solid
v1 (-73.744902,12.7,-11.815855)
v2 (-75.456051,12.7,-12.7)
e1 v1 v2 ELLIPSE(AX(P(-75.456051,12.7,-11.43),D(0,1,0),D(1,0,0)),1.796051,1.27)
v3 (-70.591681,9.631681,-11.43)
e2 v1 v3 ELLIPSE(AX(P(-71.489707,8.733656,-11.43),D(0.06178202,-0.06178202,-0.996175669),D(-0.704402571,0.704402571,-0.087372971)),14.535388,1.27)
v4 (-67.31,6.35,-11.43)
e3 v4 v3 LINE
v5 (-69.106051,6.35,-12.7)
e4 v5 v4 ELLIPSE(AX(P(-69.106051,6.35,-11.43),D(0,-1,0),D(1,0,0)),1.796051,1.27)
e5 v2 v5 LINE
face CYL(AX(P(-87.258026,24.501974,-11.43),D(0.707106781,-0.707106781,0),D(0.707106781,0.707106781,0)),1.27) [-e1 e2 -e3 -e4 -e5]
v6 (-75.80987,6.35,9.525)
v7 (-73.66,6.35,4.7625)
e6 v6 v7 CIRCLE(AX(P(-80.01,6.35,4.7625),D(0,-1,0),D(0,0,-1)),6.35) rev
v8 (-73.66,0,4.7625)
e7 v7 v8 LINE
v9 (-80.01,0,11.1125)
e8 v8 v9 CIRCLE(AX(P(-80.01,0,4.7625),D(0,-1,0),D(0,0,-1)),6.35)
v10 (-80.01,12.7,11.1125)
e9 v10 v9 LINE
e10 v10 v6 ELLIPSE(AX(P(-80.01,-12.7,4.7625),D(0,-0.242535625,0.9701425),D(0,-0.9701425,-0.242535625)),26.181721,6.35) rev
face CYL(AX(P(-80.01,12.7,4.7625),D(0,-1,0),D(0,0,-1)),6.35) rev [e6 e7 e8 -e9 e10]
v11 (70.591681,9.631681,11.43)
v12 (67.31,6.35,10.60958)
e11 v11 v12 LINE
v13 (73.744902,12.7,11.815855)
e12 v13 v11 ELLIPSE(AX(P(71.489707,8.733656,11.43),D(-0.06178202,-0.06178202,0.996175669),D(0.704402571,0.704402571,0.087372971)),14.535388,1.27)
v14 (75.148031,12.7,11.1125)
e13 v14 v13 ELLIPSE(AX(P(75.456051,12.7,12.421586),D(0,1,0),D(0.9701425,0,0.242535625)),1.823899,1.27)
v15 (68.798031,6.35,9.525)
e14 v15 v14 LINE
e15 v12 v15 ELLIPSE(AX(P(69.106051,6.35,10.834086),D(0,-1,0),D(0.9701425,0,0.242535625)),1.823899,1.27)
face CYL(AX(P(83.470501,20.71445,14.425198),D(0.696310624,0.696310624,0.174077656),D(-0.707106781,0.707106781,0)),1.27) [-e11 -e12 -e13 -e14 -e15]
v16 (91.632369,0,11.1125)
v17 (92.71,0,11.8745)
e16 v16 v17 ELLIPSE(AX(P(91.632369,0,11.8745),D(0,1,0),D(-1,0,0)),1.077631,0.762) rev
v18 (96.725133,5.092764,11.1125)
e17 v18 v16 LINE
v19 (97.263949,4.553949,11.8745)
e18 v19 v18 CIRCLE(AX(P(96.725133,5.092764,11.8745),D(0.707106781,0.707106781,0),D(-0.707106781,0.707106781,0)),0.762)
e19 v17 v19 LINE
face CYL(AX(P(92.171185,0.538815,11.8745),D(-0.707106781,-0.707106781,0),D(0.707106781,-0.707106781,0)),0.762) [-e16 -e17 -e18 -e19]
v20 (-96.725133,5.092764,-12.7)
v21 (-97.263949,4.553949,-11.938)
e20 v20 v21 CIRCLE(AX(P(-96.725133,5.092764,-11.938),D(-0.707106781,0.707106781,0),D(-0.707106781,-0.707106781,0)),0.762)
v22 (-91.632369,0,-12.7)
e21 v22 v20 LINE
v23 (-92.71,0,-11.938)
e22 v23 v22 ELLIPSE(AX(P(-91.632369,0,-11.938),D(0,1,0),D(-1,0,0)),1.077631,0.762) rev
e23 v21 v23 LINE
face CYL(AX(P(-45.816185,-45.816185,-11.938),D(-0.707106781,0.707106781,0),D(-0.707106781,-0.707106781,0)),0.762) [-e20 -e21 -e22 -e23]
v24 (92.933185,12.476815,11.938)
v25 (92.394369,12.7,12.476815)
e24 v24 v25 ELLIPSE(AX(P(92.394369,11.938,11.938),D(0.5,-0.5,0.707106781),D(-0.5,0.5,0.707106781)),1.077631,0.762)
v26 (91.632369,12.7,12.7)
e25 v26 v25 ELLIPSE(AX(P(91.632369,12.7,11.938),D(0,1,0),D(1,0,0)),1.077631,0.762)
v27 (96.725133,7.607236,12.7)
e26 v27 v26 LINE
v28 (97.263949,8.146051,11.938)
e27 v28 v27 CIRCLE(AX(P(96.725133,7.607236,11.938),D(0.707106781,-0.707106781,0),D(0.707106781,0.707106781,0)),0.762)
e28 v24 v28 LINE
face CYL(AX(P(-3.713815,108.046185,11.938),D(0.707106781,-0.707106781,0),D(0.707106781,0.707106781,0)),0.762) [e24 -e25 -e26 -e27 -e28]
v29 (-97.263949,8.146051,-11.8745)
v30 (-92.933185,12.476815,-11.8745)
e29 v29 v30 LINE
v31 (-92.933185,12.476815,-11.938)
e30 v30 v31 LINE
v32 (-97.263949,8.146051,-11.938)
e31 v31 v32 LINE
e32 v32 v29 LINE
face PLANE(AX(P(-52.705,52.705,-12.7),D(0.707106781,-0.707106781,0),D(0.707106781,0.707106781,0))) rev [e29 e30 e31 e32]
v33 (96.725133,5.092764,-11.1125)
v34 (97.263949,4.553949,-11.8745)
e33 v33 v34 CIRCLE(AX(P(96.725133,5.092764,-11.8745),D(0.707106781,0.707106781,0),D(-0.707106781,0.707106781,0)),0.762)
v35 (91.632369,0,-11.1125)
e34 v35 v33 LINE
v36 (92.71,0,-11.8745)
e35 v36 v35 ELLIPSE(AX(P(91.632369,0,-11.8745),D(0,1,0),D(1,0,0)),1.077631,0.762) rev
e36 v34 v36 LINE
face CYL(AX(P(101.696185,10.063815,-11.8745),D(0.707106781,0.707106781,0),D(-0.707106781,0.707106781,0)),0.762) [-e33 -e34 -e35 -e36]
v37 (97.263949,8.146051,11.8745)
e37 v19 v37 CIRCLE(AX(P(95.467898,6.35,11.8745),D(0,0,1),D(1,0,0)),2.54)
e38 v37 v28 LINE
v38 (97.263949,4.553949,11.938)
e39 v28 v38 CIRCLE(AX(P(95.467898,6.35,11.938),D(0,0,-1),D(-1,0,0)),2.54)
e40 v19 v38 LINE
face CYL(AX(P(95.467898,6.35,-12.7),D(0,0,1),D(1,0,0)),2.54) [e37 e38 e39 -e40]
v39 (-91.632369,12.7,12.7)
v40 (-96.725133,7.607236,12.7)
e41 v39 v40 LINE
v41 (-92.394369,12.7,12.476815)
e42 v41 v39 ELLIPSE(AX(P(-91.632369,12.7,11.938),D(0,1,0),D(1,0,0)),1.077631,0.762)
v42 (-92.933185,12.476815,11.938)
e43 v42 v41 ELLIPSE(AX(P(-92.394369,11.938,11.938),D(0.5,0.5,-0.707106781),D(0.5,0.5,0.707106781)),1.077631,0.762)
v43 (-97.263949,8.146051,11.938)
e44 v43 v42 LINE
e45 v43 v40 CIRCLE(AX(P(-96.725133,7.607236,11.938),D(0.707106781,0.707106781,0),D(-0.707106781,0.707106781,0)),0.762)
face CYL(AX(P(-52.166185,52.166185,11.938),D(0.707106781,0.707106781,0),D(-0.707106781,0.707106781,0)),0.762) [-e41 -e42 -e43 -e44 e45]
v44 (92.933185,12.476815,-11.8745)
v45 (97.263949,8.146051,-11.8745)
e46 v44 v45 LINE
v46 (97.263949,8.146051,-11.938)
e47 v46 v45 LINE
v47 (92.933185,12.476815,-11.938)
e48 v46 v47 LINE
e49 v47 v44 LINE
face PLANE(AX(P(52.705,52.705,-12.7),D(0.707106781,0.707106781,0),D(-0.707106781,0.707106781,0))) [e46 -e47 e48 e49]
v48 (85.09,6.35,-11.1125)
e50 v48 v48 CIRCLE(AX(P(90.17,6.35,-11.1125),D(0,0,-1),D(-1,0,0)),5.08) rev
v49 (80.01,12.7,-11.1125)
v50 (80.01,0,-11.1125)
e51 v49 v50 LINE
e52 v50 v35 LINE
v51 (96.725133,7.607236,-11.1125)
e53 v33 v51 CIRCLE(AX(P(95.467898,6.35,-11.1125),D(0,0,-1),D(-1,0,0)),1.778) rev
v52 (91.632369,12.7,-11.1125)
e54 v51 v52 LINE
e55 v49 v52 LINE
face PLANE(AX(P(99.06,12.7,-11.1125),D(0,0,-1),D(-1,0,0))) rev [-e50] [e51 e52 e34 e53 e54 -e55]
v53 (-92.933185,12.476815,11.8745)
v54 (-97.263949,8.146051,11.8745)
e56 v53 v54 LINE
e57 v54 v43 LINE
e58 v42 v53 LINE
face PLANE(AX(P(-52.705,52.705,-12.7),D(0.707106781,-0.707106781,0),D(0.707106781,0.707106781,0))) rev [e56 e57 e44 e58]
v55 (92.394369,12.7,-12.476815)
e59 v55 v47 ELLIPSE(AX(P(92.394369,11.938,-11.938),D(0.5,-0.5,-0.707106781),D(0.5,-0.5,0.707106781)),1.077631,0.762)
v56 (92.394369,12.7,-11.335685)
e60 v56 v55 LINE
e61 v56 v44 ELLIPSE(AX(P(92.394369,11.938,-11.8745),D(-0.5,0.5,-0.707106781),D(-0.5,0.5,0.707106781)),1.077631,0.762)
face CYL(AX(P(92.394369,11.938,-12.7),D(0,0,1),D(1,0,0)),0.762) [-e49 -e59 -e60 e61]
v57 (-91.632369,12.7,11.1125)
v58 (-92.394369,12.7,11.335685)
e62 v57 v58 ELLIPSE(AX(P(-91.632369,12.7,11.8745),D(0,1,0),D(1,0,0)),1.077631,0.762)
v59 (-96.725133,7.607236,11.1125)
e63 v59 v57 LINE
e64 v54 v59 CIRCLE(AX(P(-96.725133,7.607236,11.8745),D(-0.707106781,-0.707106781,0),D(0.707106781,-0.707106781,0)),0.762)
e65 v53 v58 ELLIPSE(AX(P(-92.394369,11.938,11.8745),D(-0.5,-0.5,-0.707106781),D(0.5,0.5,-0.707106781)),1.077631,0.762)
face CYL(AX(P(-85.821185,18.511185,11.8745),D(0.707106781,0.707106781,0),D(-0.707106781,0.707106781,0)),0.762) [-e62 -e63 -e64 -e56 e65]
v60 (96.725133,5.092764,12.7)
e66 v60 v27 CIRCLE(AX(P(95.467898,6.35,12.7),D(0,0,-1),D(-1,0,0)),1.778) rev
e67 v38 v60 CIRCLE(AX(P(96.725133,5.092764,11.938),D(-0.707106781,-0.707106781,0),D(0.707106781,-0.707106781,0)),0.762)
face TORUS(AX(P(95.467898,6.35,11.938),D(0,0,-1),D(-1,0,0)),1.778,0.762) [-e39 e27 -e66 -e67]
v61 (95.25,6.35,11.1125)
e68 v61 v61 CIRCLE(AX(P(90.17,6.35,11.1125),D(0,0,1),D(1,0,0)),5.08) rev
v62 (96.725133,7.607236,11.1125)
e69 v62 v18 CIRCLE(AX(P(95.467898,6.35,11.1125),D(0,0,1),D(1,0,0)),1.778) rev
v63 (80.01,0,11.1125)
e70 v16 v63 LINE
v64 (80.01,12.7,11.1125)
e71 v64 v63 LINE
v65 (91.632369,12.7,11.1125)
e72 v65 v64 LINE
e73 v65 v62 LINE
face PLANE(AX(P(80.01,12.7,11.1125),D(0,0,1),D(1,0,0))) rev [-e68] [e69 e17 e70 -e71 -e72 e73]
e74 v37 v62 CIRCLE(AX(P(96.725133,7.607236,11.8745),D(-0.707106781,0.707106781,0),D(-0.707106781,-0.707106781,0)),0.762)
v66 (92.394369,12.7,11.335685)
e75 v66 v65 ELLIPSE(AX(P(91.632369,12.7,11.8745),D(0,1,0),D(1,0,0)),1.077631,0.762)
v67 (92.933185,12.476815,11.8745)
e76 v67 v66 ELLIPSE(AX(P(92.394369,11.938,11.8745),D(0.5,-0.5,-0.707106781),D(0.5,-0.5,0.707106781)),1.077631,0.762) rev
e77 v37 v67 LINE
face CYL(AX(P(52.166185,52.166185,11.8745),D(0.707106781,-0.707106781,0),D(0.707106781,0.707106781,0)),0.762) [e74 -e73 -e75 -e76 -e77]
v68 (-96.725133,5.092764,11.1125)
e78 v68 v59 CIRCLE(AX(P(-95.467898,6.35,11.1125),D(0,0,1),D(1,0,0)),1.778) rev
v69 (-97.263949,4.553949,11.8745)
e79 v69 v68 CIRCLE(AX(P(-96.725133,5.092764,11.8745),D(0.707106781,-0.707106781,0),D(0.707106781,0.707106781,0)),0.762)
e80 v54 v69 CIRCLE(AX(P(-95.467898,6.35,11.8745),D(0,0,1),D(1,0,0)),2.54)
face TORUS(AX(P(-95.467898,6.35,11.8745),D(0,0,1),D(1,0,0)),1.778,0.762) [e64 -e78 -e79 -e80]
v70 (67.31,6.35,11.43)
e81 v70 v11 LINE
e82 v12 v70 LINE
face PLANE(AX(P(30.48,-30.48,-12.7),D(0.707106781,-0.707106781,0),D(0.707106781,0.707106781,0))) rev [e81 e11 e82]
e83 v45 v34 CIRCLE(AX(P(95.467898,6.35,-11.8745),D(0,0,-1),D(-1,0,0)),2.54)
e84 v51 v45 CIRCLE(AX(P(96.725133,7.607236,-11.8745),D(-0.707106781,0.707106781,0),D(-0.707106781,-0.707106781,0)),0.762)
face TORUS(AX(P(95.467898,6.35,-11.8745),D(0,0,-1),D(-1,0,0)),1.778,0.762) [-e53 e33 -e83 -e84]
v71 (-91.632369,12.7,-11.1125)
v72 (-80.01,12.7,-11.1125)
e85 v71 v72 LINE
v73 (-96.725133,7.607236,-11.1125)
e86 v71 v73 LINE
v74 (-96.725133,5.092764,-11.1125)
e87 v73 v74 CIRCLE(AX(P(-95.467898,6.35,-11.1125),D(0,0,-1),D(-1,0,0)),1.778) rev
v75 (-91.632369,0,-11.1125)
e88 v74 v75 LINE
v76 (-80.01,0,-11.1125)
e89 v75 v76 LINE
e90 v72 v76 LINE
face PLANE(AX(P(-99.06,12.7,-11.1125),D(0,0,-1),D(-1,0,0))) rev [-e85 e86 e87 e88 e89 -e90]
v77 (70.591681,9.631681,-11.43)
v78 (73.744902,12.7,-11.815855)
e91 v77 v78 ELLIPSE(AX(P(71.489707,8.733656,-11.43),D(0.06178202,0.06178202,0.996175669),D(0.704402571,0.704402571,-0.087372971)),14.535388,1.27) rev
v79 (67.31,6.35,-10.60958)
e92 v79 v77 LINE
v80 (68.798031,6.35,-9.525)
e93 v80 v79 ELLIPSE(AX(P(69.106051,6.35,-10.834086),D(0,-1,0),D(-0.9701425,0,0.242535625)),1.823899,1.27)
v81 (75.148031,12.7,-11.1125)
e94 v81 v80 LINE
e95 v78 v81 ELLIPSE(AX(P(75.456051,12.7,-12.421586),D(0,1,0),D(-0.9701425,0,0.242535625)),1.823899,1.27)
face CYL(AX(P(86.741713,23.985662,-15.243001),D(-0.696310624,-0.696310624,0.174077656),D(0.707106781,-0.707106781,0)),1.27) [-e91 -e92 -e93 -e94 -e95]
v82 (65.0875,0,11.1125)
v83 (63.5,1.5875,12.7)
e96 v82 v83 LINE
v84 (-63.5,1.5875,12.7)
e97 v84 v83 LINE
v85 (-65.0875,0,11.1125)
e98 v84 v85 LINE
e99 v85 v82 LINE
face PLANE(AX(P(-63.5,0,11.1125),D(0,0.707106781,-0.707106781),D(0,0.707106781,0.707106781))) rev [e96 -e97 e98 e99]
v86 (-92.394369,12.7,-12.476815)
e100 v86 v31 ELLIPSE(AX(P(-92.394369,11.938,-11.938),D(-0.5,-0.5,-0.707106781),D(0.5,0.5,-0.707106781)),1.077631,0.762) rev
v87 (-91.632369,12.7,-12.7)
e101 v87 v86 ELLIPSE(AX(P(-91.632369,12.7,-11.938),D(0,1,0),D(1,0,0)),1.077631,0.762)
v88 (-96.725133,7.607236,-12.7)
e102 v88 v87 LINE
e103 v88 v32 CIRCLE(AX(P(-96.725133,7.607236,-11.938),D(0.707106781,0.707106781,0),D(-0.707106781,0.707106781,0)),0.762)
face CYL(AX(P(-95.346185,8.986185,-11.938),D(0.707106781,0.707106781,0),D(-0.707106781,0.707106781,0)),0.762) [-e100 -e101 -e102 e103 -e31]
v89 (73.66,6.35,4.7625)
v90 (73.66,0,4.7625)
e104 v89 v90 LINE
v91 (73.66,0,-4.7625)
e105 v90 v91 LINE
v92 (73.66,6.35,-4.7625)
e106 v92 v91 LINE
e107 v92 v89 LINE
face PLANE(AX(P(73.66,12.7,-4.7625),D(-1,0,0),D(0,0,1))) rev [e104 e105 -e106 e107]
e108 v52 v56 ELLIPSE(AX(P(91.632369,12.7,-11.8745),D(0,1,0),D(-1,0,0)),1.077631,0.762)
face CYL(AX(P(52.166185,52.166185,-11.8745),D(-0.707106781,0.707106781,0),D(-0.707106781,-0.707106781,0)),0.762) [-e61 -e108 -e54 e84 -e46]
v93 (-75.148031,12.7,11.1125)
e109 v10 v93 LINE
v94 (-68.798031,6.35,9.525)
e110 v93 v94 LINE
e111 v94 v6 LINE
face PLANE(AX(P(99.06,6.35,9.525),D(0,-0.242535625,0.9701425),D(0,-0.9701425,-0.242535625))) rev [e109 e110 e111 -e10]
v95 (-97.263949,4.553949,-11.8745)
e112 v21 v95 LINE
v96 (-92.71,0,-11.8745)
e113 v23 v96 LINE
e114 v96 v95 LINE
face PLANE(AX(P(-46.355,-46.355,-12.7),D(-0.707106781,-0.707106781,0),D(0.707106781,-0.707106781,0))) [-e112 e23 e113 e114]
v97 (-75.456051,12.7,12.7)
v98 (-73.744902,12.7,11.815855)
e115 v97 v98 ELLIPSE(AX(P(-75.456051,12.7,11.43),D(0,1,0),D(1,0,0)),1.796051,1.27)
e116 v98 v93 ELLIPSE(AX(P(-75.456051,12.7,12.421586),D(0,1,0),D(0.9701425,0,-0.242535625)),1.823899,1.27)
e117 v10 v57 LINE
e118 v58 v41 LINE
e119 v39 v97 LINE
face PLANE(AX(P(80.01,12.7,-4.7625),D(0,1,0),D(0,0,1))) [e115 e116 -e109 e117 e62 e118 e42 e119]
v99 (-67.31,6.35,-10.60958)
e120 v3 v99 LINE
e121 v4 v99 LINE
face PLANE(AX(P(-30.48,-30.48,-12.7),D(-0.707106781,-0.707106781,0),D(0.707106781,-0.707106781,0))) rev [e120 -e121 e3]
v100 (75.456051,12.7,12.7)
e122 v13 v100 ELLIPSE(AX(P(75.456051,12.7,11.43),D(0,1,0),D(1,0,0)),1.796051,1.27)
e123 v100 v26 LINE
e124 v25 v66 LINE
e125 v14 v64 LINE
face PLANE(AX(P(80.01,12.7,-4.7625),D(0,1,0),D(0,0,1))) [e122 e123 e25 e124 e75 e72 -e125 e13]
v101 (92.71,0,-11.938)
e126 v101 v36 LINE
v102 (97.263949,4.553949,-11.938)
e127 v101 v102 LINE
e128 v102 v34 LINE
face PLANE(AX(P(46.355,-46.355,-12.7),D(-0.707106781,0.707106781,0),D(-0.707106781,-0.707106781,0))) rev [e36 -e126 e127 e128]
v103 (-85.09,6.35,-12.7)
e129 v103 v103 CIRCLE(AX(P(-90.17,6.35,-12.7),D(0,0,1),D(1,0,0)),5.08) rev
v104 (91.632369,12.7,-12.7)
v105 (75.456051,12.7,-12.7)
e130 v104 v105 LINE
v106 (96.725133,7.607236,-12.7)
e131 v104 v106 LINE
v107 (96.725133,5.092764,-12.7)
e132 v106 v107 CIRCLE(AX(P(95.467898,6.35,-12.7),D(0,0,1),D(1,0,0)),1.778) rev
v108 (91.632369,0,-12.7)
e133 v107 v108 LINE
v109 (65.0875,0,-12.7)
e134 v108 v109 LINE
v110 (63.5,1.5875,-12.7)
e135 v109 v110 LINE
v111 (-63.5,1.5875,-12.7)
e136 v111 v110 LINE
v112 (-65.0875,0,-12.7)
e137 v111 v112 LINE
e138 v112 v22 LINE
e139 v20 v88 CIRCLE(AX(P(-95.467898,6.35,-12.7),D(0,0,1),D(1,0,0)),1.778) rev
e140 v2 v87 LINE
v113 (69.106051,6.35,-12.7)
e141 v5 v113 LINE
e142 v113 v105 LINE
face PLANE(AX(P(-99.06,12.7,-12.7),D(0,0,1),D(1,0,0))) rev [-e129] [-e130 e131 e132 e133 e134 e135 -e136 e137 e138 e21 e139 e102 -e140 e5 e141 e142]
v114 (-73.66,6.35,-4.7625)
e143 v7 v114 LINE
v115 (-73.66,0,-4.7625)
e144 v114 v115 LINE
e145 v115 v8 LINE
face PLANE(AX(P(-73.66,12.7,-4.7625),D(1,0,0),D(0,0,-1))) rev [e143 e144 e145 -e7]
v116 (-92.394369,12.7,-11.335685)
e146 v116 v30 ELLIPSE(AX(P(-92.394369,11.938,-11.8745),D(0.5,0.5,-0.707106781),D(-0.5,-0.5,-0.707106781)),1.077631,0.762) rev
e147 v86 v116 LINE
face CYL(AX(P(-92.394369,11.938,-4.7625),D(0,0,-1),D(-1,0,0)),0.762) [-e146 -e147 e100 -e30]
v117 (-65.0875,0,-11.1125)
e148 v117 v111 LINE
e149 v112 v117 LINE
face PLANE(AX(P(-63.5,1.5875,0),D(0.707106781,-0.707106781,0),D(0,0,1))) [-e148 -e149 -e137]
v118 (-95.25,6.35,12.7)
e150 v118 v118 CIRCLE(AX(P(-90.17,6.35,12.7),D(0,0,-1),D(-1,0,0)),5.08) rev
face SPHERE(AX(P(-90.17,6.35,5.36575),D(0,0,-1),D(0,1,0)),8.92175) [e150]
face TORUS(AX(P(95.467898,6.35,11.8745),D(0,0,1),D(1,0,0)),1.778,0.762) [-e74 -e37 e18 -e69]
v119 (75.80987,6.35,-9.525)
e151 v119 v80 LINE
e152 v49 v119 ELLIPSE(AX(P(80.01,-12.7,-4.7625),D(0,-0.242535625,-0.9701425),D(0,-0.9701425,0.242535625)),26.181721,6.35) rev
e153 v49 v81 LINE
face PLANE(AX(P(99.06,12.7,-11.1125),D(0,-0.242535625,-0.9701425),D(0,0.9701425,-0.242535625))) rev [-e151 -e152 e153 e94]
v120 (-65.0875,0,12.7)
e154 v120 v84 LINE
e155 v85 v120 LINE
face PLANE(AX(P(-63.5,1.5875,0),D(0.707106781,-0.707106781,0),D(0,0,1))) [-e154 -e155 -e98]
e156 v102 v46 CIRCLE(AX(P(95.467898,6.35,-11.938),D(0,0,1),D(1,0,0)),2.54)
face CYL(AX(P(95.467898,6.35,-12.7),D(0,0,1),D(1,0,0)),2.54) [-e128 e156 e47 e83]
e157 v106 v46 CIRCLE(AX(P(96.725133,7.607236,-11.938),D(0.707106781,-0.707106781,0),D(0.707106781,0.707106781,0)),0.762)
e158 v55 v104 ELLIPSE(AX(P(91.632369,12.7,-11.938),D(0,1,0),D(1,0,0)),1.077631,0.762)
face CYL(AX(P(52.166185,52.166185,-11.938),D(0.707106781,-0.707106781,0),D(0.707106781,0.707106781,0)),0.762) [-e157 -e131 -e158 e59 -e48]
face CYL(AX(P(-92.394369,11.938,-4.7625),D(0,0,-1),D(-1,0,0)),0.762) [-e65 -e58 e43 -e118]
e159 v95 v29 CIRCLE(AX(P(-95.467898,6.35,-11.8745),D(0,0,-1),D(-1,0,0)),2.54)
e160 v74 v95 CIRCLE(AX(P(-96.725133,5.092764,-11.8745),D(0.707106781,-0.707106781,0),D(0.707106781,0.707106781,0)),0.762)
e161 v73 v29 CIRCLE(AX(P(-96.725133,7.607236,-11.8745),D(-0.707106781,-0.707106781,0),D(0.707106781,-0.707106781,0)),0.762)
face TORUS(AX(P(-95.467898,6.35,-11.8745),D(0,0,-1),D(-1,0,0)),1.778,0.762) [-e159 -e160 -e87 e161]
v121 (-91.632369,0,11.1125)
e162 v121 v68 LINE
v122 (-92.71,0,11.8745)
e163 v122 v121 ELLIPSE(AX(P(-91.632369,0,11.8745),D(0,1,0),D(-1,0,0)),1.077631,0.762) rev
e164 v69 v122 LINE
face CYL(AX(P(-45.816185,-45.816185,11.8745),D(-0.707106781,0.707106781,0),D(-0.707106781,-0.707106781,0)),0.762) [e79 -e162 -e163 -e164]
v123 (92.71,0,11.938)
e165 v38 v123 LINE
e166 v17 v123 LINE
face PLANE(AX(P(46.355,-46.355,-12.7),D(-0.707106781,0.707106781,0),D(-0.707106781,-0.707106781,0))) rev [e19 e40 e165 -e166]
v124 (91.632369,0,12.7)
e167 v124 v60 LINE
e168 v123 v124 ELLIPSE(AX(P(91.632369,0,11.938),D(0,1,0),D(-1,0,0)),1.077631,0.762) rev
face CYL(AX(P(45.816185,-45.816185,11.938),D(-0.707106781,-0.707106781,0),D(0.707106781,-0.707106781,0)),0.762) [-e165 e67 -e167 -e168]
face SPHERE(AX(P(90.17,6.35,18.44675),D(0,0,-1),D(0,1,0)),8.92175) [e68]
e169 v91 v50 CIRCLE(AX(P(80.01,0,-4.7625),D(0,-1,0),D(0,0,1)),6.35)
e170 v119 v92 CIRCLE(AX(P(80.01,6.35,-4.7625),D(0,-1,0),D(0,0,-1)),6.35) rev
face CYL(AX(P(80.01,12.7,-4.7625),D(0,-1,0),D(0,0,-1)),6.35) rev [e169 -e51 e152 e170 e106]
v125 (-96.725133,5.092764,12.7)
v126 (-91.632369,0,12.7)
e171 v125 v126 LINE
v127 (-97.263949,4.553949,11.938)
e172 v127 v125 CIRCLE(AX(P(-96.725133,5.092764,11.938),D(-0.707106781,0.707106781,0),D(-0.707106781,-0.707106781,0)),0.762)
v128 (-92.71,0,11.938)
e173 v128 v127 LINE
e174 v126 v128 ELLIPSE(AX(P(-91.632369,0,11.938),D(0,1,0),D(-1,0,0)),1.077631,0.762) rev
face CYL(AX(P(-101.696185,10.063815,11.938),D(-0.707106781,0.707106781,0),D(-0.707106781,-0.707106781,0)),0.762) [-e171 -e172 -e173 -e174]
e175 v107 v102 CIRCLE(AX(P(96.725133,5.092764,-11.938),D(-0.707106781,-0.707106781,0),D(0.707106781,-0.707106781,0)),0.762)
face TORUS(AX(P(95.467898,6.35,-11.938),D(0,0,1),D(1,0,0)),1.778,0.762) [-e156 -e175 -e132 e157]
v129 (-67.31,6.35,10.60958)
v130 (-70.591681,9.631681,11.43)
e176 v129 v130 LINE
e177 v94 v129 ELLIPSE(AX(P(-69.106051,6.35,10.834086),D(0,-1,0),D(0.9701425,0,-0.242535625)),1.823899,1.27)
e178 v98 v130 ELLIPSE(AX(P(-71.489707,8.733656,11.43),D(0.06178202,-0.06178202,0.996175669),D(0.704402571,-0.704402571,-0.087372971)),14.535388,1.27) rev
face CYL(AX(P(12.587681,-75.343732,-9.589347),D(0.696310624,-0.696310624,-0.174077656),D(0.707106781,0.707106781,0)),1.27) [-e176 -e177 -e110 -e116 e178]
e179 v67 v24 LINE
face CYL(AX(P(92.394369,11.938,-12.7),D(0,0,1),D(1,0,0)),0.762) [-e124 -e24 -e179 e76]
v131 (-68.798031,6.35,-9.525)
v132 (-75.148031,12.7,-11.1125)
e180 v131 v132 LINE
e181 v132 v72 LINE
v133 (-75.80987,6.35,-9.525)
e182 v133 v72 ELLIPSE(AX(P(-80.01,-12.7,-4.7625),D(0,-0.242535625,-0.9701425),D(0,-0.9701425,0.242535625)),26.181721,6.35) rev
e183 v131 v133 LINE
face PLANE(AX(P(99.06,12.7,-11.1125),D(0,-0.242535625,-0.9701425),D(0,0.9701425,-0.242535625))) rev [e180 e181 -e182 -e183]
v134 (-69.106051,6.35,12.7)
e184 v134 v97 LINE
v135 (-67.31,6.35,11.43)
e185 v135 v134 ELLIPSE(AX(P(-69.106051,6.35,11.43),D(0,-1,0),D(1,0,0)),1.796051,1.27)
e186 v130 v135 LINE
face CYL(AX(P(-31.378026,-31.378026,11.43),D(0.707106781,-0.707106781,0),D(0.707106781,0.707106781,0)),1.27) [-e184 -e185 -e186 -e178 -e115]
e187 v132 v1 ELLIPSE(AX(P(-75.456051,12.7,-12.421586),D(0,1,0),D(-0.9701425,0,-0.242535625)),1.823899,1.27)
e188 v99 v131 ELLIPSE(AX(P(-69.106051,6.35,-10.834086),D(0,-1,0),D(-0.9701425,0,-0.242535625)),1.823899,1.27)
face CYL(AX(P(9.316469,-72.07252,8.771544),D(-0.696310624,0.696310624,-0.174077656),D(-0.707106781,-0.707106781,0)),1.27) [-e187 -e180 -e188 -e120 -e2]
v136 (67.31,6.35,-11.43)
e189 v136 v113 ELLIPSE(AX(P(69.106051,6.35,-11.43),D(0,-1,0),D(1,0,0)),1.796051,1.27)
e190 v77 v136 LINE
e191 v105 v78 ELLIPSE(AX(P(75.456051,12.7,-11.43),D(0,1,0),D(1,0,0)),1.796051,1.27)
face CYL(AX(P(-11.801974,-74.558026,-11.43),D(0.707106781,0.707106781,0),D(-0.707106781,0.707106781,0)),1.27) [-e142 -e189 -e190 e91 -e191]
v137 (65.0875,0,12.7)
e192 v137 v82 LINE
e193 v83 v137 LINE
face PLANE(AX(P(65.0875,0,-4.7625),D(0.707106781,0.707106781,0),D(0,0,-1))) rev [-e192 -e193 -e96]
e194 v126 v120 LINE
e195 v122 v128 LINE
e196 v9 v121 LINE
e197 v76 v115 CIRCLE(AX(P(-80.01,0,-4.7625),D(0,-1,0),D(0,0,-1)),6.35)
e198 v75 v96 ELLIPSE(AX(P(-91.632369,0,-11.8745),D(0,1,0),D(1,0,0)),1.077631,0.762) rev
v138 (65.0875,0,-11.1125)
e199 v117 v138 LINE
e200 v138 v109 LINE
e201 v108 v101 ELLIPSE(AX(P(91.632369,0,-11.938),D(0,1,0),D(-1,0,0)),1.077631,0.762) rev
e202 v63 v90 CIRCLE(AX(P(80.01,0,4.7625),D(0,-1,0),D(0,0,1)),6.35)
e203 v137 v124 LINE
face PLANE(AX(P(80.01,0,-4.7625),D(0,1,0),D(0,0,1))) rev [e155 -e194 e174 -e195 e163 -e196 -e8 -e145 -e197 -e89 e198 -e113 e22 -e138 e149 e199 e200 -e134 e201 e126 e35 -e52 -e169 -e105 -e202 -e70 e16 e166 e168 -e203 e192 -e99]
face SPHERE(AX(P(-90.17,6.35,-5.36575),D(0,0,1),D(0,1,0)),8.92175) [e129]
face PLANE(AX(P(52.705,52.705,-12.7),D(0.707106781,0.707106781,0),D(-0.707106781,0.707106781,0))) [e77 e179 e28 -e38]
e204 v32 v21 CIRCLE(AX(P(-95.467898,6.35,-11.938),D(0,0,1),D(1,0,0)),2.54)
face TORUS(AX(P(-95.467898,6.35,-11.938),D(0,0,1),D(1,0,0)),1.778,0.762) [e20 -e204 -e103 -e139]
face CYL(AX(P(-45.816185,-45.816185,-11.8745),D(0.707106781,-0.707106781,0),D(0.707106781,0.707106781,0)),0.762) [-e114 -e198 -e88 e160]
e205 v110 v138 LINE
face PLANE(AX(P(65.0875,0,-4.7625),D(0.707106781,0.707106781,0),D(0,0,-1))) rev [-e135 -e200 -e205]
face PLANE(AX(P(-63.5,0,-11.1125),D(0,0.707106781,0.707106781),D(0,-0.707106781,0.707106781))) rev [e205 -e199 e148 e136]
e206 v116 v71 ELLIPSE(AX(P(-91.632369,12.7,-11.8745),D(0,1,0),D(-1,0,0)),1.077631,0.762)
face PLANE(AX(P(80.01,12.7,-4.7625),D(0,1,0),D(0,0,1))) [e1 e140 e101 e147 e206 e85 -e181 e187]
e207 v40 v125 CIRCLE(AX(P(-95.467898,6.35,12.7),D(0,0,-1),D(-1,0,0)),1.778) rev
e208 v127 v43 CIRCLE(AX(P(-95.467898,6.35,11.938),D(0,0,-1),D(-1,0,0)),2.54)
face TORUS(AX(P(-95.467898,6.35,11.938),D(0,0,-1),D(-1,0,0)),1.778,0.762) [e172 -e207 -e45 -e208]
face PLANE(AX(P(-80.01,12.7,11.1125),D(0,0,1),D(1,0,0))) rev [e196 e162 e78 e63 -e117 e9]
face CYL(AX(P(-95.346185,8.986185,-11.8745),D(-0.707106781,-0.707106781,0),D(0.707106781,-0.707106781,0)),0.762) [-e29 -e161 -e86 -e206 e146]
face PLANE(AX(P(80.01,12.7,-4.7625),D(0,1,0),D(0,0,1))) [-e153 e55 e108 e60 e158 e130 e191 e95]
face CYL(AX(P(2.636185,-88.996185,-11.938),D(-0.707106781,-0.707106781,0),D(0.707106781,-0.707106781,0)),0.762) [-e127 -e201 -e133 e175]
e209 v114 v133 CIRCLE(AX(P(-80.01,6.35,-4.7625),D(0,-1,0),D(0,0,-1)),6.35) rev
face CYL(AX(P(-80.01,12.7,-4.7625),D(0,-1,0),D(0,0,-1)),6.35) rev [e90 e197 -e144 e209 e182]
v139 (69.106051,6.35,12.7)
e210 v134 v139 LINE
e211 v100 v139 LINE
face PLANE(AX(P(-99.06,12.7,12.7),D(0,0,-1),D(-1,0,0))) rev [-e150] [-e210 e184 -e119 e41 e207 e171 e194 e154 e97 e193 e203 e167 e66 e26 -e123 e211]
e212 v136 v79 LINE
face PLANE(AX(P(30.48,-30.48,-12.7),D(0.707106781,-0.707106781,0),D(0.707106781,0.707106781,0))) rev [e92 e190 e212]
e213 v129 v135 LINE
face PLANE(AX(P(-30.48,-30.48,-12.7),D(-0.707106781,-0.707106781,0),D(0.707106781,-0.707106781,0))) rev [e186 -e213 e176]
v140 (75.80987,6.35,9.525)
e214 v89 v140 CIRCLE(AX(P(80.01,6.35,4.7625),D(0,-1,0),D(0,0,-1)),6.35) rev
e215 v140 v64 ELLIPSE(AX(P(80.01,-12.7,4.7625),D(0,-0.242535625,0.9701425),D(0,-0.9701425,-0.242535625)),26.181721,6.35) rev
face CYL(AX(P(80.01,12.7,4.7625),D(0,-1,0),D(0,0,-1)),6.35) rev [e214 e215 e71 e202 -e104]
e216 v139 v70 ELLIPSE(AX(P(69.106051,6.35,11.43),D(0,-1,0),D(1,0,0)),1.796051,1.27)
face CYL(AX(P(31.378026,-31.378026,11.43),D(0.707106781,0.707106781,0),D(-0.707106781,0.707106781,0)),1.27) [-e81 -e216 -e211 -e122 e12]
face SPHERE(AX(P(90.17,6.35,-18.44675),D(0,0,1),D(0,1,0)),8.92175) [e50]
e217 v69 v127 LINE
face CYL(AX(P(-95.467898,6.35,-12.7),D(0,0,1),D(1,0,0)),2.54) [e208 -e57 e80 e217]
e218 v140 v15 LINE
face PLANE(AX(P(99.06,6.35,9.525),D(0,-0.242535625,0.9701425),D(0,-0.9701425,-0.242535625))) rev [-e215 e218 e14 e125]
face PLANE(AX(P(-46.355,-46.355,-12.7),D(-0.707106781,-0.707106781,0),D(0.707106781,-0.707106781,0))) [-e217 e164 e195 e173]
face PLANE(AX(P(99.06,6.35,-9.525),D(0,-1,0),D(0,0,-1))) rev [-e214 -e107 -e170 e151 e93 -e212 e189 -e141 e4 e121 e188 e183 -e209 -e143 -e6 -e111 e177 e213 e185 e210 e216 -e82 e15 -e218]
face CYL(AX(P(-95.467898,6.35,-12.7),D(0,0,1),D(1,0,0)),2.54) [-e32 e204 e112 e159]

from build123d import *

# Parameters (mm, degrees)
BOSS_EXTRUDE1_DEPTH = 12.7
CUT_EXTRUDE2_DEPTH  = 199.932436772
CUT_EXTRUDE1_DEPTH  = 104.050150898
CUT_EXTRUDE3_DEPTH  = 63.5
CHAMFER1_SIZE       = 1.5875
FILLET1_R           = 0.762
FILLET2_R           = 1.27


# Some blends are built 0.0001 mm under size
with BuildPart() as part:
    # Sketch1 → Boss-Extrude1 (new body)
    with BuildSketch(Plane(origin=(0, 0, 0), x_dir=(1, 0, 0), z_dir=(0, 1, 0))):
        with BuildLine():
            Line((-99.06, -12.7), (99.06, -12.7))
            Line((99.06, -12.7), (99.06, -11.1125))
            Line((99.06, -11.1125), (80.01, -11.1125))
            ThreePointArc((80.01, -11.1125), (75.519871939, -9.252628061), (73.66, -4.7625))
            Line((73.66, -4.7625), (73.66, 4.7625))
            ThreePointArc((73.66, 4.7625), (75.519871939, 9.252628061), (80.01, 11.1125))
            Line((80.01, 11.1125), (99.06, 11.1125))
            Line((99.06, 11.1125), (99.06, 12.7))
            Line((99.06, 12.7), (-99.06, 12.7))
            Line((-99.06, 12.7), (-99.06, 11.1125))
            Line((-99.06, 11.1125), (-80.01, 11.1125))
            ThreePointArc((-80.01, 11.1125), (-75.519871939, 9.252628061), (-73.66, 4.7625))
            Line((-73.66, 4.7625), (-73.66, -4.7625))
            ThreePointArc((-73.66, -4.7625), (-75.519871939, -9.252628061), (-80.01, -11.1125))
            Line((-80.01, -11.1125), (-99.06, -11.1125))
            Line((-99.06, -11.1125), (-99.06, -12.7))
        make_face()
    extrude(amount=BOSS_EXTRUDE1_DEPTH)

    # Sketch3 → Cut-Extrude2 (cut, through all)
    with BuildSketch(Plane.ZY.offset(99.06)):
        Polygon((11.1125, 12.7), (4.7625, 12.7), (-4.7625, 12.7), (-11.1125, 12.7), (-9.525, 6.35), (9.525, 6.35), align=None)
    extrude(amount=-CUT_EXTRUDE2_DEPTH, mode=Mode.SUBTRACT)

    # Sketch2 → Cut-Extrude1 (cut, through all)
    with BuildSketch(Plane.XY.offset(12.7)):
        Polygon((73.66, 12.7), (-73.66, 12.7), (-67.31, 6.35), (67.31, 6.35), align=None)
        with BuildLine():
            Line((97.263948776, 4.553948776), (92.71, 0))
            Line((92.71, 0), (99.06, 0))
            Line((99.06, 0), (99.06, 12.7))
            Line((99.06, 12.7), (92.71, 12.7))
            Line((92.71, 12.7), (97.263948776, 8.146051224))
            ThreePointArc((97.263948776, 8.146051224), (98.007897552, 6.35), (97.263948776, 4.553948776))
        make_face()
        with BuildLine():
            ThreePointArc((-97.263948776, 4.553948776), (-98.007897552, 6.35), (-97.263948776, 8.146051224))
            Line((-97.263948776, 8.146051224), (-92.71, 12.7))
            Line((-92.71, 12.7), (-99.06, 12.7))
            Line((-99.06, 12.7), (-99.06, 0))
            Line((-99.06, 0), (-92.71, 0))
            Line((-92.71, 0), (-97.263948776, 4.553948776))
        make_face()
    extrude(amount=-CUT_EXTRUDE1_DEPTH, mode=Mode.SUBTRACT)

    # Sketch4 → Revolve1 (revolve)
    with BuildSketch(Plane.ZY.offset(90.17)):
        with BuildLine():
            Line((12.7, 6.35), (12.7, 11.43))
            ThreePointArc((12.7, 11.43), (13.881381744, 9.01113492), (14.2875, 6.35))
            Line((14.2875, 6.35), (12.7, 6.35))
        make_face()
    revolve1 = revolve(axis=Axis((-90.17, 6.35, 0), (0, 0, 1)))

    # Mirror1: Revolve1 across plane
    add(revolve1.mirror(Plane.XY))

    # Sketch5 → Revolve2 (revolve)
    with BuildSketch(Plane(origin=(90.17, 0, 0), x_dir=(0, 0, -1), z_dir=(1, 0, 0))):
        with BuildLine():
            Line((11.1125, 6.35), (11.1125, 11.43))
            ThreePointArc((11.1125, 11.43), (9.931118256, 9.01113492), (9.525, 6.35))
            Line((9.525, 6.35), (11.1125, 6.35))
        make_face()
    revolve2 = revolve(axis=Axis((90.17, 6.35, 0), (0, 0, -1)))

    # Mirror2: Revolve2 across plane
    add(revolve2.mirror(Plane.XY))

    # Sketch6 → Cut-Extrude3 (cut, symmetric)
    with BuildSketch(Plane(origin=(0, 0, 0), x_dir=(0, 0, -1), z_dir=(1, 0, 0))):
        Polygon((-12.7, 0), (-11.1125, 0), (-12.7, 1.5875), align=None)
        Polygon((11.1125, 0), (12.7, 1.5875), (12.7, 0), align=None)
    extrude(amount=CUT_EXTRUDE3_DEPTH, both=True, mode=Mode.SUBTRACT)

    # Chamfer1
    chamfer1_edges = [part.edges().sort_by_distance(p)[0] for p in [
        (63.5, 0, 11.90625),
        (63.5, 0, -11.90625),
        (-63.5, 0, -11.90625),
        (-63.5, 0, 11.90625),
    ]]
    chamfer(chamfer1_edges, length=CHAMFER1_SIZE - 0.0001)  # a hair under: the kernel refuses the full size

    # Fillet1
    fillet1_edges = [part.edges().sort_by_distance(p)[0] for p in [
        (-98.007897552, 6.35, 12.7),
        (-92.71, 12.7, -11.90625),
        (-94.986974388, 10.423025612, -11.1125),
        (-94.986974388, 10.423025612, -12.7),
        (-94.986974388, 10.423025612, 11.1125),
        (-92.71, 12.7, 11.90625),
        (-94.986974388, 2.276974388, 12.7),
        (-98.007897552, 6.35, -11.1125),
        (-98.007897552, 6.35, 11.1125),
        (-94.986974388, 2.276974388, -11.1125),
        (-94.986974388, 2.276974388, 11.1125),
        (-98.007897552, 6.35, -12.7),
        (-94.986974388, 2.276974388, -12.7),
        (-94.986974388, 10.423025612, 12.7),
        (98.007897552, 6.35, 12.7),
        (92.71, 12.7, 11.90625),
        (92.71, 12.7, -11.90625),
        (94.986974388, 10.423025612, 12.7),
        (94.986974388, 2.276974388, 11.1125),
        (94.986974388, 2.276974388, -11.1125),
        (94.986974388, 2.276974388, -12.7),
        (98.007897552, 6.35, 11.1125),
        (94.986974388, 10.423025612, 11.1125),
        (94.986974388, 10.423025612, -11.1125),
        (98.007897552, 6.35, -12.7),
        (94.986974388, 10.423025612, -12.7),
        (94.986974388, 2.276974388, 12.7),
        (98.007897552, 6.35, -11.1125),
    ]]
    fillet(fillet1_edges, radius=FILLET1_R)

    # Fillet2
    # the kernel refuses this fillet: 1.27 mm, written as the material it takes off along each edge
    with BuildSketch(Plane(origin=(-75.90506403, 14.94506403, -12.7), x_dir=(-0.7071067811865446, -0.7071067811865505, 0), z_dir=(0.7071067811865506, -0.7071067811865446, 0))) as fillet2_piece_1_section:
        with BuildLine():
            CenterArc((FILLET2_R, -FILLET2_R), FILLET2_R, 90, 90)
            Line((0, -FILLET2_R), (0, 0))
            Line((0, 0), (FILLET2_R, 0))
        make_face()
    fillet2_piece_1 = extrude(amount=15.330256121, mode=Mode.PRIVATE)
    fillet2_piece_1 = split(fillet2_piece_1, bisect_by=Plane(origin=(-71.905795305, 6.35, -12.408746665), z_dir=(0, 1, 0)), keep=Keep.TOP, mode=Mode.PRIVATE)
    add(fillet2_piece_1, mode=Mode.SUBTRACT)
    with BuildSketch(Plane(origin=(-65.450815483, 4.490815483, -9.060203871), x_dir=(0.1230914909792504, -0.12309149097924957, -0.9847319278346824), z_dir=(-0.696310623822809, 0.6963106238228031, -0.17407765595558086))) as fillet2_piece_2_section:
        with BuildLine():
            CenterArc((FILLET2_R * 0.840960781889, FILLET2_R), FILLET2_R, 189.874961398, 80.125038602)
            Line((-FILLET2_R * 0.144223584254, FILLET2_R * 0.828501414858), (0, 0))
            Line((0, 0), (FILLET2_R * 0.840960781889, 0))
        make_face()
    fillet2_piece_2 = extrude(amount=14.459594166, mode=Mode.PRIVATE)
    fillet2_piece_2 = split(fillet2_piece_2, bisect_by=Plane(origin=(-71.646234354, 6.35, -10.770930609), z_dir=(0, 1, 0)), keep=Keep.TOP, mode=Mode.PRIVATE)
    add(fillet2_piece_2, mode=Mode.SUBTRACT)
    with BuildSketch(Plane(origin=(-75.519184517, 14.559184517, 11.577296129), x_dir=(-0.7177405625652845, -0.6755205294731655, -0.1688801323683837), z_dir=(0.69631062382278, -0.6963106238227741, -0.17407765595581334))) as fillet2_piece_3_section:
        with BuildLine():
            CenterArc((FILLET2_R * 0.840960781889, -FILLET2_R), FILLET2_R, 90, 80.125038602)
            Line((-FILLET2_R * 0.144223584254, -FILLET2_R * 0.828501414857), (0, 0))
            Line((0, 0), (FILLET2_R * 0.840960781889, 0))
        make_face()
    fillet2_piece_3 = extrude(amount=14.459594166, mode=Mode.PRIVATE)
    fillet2_piece_3 = split(fillet2_piece_3, bisect_by=Plane(origin=(-71.646234354, 6.35, 10.770930609), z_dir=(0, 1, 0)), keep=Keep.TOP, mode=Mode.PRIVATE)
    add(fillet2_piece_3, mode=Mode.SUBTRACT)
    with BuildSketch(Plane(origin=(-75.90506403, 14.94506403, 12.7), x_dir=(-0.7071067811865445, -0.7071067811865505, 0), z_dir=(0.7071067811865506, -0.7071067811865446, 0))) as fillet2_piece_4_section:
        with BuildLine():
            CenterArc((FILLET2_R, FILLET2_R), FILLET2_R, 180, 90)
            Line((0, FILLET2_R), (0, 0))
            Line((0, 0), (FILLET2_R, 0))
        make_face()
    fillet2_piece_4 = extrude(amount=15.330256121, mode=Mode.PRIVATE)
    fillet2_piece_4 = split(fillet2_piece_4, bisect_by=Plane(origin=(-71.905795305, 6.35, 12.408746665), z_dir=(0, 1, 0)), keep=Keep.TOP, mode=Mode.PRIVATE)
    add(fillet2_piece_4, mode=Mode.SUBTRACT)
    with BuildSketch(Plane(origin=(65.06493597, 4.10493597, -12.7), x_dir=(0.7071067811865445, -0.7071067811865506, 0), z_dir=(0.7071067811865506, 0.7071067811865445, 0))) as fillet2_piece_5_section:
        with BuildLine():
            CenterArc((FILLET2_R, -FILLET2_R), FILLET2_R, 90, 90)
            Line((0, -FILLET2_R), (0, 0))
            Line((0, 0), (FILLET2_R, 0))
        make_face()
    fillet2_piece_5 = extrude(amount=15.330256121, mode=Mode.PRIVATE)
    fillet2_piece_5 = split(fillet2_piece_5, bisect_by=Plane(origin=(71.905795305, 6.35, -12.408746665), z_dir=(0, 1, 0)), keep=Keep.TOP, mode=Mode.PRIVATE)
    add(fillet2_piece_5, mode=Mode.SUBTRACT)
    with BuildSketch(Plane(origin=(75.519184517, 14.559184517, -11.577296129), x_dir=(-0.12309149097927001, -0.12309149097926336, -0.9847319278346782), z_dir=(-0.6963106238228061, -0.6963106238228001, 0.17407765595560445))) as fillet2_piece_6_section:
        with BuildLine():
            CenterArc((FILLET2_R * 0.840960781889, FILLET2_R), FILLET2_R, 189.874961398, 80.125038602)
            Line((-FILLET2_R * 0.144223584254, FILLET2_R * 0.828501414858), (0, 0))
            Line((0, 0), (FILLET2_R * 0.84096078189, 0))
        make_face()
    fillet2_piece_6 = extrude(amount=14.459594166, mode=Mode.PRIVATE)
    fillet2_piece_6 = split(fillet2_piece_6, bisect_by=Plane(origin=(71.646234354, 6.35, -10.770930609), z_dir=(0, 1, 0)), keep=Keep.TOP, mode=Mode.PRIVATE)
    add(fillet2_piece_6, mode=Mode.SUBTRACT)
    with BuildSketch(Plane(origin=(65.06493597, 4.10493597, 12.7), x_dir=(0.7071067811865445, -0.7071067811865507, 0), z_dir=(0.7071067811865506, 0.7071067811865445, 0))) as fillet2_piece_7_section:
        with BuildLine():
            CenterArc((FILLET2_R, FILLET2_R), FILLET2_R, 180, 90)
            Line((0, FILLET2_R), (0, 0))
            Line((0, 0), (FILLET2_R, 0))
        make_face()
    fillet2_piece_7 = extrude(amount=15.330256121, mode=Mode.PRIVATE)
    fillet2_piece_7 = split(fillet2_piece_7, bisect_by=Plane(origin=(71.905795305, 6.35, 12.408746665), z_dir=(0, 1, 0)), keep=Keep.TOP, mode=Mode.PRIVATE)
    add(fillet2_piece_7, mode=Mode.SUBTRACT)
    with BuildSketch(Plane(origin=(65.450815483, 4.490815483, 9.060203871), x_dir=(0.7177405625652817, -0.6755205294731627, -0.16888013236840813), z_dir=(0.6963106238227829, 0.6963106238227769, 0.1740776559557897))) as fillet2_piece_8_section:
        with BuildLine():
            CenterArc((FILLET2_R * 0.840960781889, -FILLET2_R), FILLET2_R, 90, 80.125038602)
            Line((-FILLET2_R * 0.144223584254, -FILLET2_R * 0.828501414857), (0, 0))
            Line((0, 0), (FILLET2_R * 0.840960781889, 0))
        make_face()
    fillet2_piece_8 = extrude(amount=14.459594166, mode=Mode.PRIVATE)
    fillet2_piece_8 = split(fillet2_piece_8, bisect_by=Plane(origin=(71.646234354, 6.35, 10.770930609), z_dir=(0, 1, 0)), keep=Keep.TOP, mode=Mode.PRIVATE)
    add(fillet2_piece_8, mode=Mode.SUBTRACT)


solid = part.part
